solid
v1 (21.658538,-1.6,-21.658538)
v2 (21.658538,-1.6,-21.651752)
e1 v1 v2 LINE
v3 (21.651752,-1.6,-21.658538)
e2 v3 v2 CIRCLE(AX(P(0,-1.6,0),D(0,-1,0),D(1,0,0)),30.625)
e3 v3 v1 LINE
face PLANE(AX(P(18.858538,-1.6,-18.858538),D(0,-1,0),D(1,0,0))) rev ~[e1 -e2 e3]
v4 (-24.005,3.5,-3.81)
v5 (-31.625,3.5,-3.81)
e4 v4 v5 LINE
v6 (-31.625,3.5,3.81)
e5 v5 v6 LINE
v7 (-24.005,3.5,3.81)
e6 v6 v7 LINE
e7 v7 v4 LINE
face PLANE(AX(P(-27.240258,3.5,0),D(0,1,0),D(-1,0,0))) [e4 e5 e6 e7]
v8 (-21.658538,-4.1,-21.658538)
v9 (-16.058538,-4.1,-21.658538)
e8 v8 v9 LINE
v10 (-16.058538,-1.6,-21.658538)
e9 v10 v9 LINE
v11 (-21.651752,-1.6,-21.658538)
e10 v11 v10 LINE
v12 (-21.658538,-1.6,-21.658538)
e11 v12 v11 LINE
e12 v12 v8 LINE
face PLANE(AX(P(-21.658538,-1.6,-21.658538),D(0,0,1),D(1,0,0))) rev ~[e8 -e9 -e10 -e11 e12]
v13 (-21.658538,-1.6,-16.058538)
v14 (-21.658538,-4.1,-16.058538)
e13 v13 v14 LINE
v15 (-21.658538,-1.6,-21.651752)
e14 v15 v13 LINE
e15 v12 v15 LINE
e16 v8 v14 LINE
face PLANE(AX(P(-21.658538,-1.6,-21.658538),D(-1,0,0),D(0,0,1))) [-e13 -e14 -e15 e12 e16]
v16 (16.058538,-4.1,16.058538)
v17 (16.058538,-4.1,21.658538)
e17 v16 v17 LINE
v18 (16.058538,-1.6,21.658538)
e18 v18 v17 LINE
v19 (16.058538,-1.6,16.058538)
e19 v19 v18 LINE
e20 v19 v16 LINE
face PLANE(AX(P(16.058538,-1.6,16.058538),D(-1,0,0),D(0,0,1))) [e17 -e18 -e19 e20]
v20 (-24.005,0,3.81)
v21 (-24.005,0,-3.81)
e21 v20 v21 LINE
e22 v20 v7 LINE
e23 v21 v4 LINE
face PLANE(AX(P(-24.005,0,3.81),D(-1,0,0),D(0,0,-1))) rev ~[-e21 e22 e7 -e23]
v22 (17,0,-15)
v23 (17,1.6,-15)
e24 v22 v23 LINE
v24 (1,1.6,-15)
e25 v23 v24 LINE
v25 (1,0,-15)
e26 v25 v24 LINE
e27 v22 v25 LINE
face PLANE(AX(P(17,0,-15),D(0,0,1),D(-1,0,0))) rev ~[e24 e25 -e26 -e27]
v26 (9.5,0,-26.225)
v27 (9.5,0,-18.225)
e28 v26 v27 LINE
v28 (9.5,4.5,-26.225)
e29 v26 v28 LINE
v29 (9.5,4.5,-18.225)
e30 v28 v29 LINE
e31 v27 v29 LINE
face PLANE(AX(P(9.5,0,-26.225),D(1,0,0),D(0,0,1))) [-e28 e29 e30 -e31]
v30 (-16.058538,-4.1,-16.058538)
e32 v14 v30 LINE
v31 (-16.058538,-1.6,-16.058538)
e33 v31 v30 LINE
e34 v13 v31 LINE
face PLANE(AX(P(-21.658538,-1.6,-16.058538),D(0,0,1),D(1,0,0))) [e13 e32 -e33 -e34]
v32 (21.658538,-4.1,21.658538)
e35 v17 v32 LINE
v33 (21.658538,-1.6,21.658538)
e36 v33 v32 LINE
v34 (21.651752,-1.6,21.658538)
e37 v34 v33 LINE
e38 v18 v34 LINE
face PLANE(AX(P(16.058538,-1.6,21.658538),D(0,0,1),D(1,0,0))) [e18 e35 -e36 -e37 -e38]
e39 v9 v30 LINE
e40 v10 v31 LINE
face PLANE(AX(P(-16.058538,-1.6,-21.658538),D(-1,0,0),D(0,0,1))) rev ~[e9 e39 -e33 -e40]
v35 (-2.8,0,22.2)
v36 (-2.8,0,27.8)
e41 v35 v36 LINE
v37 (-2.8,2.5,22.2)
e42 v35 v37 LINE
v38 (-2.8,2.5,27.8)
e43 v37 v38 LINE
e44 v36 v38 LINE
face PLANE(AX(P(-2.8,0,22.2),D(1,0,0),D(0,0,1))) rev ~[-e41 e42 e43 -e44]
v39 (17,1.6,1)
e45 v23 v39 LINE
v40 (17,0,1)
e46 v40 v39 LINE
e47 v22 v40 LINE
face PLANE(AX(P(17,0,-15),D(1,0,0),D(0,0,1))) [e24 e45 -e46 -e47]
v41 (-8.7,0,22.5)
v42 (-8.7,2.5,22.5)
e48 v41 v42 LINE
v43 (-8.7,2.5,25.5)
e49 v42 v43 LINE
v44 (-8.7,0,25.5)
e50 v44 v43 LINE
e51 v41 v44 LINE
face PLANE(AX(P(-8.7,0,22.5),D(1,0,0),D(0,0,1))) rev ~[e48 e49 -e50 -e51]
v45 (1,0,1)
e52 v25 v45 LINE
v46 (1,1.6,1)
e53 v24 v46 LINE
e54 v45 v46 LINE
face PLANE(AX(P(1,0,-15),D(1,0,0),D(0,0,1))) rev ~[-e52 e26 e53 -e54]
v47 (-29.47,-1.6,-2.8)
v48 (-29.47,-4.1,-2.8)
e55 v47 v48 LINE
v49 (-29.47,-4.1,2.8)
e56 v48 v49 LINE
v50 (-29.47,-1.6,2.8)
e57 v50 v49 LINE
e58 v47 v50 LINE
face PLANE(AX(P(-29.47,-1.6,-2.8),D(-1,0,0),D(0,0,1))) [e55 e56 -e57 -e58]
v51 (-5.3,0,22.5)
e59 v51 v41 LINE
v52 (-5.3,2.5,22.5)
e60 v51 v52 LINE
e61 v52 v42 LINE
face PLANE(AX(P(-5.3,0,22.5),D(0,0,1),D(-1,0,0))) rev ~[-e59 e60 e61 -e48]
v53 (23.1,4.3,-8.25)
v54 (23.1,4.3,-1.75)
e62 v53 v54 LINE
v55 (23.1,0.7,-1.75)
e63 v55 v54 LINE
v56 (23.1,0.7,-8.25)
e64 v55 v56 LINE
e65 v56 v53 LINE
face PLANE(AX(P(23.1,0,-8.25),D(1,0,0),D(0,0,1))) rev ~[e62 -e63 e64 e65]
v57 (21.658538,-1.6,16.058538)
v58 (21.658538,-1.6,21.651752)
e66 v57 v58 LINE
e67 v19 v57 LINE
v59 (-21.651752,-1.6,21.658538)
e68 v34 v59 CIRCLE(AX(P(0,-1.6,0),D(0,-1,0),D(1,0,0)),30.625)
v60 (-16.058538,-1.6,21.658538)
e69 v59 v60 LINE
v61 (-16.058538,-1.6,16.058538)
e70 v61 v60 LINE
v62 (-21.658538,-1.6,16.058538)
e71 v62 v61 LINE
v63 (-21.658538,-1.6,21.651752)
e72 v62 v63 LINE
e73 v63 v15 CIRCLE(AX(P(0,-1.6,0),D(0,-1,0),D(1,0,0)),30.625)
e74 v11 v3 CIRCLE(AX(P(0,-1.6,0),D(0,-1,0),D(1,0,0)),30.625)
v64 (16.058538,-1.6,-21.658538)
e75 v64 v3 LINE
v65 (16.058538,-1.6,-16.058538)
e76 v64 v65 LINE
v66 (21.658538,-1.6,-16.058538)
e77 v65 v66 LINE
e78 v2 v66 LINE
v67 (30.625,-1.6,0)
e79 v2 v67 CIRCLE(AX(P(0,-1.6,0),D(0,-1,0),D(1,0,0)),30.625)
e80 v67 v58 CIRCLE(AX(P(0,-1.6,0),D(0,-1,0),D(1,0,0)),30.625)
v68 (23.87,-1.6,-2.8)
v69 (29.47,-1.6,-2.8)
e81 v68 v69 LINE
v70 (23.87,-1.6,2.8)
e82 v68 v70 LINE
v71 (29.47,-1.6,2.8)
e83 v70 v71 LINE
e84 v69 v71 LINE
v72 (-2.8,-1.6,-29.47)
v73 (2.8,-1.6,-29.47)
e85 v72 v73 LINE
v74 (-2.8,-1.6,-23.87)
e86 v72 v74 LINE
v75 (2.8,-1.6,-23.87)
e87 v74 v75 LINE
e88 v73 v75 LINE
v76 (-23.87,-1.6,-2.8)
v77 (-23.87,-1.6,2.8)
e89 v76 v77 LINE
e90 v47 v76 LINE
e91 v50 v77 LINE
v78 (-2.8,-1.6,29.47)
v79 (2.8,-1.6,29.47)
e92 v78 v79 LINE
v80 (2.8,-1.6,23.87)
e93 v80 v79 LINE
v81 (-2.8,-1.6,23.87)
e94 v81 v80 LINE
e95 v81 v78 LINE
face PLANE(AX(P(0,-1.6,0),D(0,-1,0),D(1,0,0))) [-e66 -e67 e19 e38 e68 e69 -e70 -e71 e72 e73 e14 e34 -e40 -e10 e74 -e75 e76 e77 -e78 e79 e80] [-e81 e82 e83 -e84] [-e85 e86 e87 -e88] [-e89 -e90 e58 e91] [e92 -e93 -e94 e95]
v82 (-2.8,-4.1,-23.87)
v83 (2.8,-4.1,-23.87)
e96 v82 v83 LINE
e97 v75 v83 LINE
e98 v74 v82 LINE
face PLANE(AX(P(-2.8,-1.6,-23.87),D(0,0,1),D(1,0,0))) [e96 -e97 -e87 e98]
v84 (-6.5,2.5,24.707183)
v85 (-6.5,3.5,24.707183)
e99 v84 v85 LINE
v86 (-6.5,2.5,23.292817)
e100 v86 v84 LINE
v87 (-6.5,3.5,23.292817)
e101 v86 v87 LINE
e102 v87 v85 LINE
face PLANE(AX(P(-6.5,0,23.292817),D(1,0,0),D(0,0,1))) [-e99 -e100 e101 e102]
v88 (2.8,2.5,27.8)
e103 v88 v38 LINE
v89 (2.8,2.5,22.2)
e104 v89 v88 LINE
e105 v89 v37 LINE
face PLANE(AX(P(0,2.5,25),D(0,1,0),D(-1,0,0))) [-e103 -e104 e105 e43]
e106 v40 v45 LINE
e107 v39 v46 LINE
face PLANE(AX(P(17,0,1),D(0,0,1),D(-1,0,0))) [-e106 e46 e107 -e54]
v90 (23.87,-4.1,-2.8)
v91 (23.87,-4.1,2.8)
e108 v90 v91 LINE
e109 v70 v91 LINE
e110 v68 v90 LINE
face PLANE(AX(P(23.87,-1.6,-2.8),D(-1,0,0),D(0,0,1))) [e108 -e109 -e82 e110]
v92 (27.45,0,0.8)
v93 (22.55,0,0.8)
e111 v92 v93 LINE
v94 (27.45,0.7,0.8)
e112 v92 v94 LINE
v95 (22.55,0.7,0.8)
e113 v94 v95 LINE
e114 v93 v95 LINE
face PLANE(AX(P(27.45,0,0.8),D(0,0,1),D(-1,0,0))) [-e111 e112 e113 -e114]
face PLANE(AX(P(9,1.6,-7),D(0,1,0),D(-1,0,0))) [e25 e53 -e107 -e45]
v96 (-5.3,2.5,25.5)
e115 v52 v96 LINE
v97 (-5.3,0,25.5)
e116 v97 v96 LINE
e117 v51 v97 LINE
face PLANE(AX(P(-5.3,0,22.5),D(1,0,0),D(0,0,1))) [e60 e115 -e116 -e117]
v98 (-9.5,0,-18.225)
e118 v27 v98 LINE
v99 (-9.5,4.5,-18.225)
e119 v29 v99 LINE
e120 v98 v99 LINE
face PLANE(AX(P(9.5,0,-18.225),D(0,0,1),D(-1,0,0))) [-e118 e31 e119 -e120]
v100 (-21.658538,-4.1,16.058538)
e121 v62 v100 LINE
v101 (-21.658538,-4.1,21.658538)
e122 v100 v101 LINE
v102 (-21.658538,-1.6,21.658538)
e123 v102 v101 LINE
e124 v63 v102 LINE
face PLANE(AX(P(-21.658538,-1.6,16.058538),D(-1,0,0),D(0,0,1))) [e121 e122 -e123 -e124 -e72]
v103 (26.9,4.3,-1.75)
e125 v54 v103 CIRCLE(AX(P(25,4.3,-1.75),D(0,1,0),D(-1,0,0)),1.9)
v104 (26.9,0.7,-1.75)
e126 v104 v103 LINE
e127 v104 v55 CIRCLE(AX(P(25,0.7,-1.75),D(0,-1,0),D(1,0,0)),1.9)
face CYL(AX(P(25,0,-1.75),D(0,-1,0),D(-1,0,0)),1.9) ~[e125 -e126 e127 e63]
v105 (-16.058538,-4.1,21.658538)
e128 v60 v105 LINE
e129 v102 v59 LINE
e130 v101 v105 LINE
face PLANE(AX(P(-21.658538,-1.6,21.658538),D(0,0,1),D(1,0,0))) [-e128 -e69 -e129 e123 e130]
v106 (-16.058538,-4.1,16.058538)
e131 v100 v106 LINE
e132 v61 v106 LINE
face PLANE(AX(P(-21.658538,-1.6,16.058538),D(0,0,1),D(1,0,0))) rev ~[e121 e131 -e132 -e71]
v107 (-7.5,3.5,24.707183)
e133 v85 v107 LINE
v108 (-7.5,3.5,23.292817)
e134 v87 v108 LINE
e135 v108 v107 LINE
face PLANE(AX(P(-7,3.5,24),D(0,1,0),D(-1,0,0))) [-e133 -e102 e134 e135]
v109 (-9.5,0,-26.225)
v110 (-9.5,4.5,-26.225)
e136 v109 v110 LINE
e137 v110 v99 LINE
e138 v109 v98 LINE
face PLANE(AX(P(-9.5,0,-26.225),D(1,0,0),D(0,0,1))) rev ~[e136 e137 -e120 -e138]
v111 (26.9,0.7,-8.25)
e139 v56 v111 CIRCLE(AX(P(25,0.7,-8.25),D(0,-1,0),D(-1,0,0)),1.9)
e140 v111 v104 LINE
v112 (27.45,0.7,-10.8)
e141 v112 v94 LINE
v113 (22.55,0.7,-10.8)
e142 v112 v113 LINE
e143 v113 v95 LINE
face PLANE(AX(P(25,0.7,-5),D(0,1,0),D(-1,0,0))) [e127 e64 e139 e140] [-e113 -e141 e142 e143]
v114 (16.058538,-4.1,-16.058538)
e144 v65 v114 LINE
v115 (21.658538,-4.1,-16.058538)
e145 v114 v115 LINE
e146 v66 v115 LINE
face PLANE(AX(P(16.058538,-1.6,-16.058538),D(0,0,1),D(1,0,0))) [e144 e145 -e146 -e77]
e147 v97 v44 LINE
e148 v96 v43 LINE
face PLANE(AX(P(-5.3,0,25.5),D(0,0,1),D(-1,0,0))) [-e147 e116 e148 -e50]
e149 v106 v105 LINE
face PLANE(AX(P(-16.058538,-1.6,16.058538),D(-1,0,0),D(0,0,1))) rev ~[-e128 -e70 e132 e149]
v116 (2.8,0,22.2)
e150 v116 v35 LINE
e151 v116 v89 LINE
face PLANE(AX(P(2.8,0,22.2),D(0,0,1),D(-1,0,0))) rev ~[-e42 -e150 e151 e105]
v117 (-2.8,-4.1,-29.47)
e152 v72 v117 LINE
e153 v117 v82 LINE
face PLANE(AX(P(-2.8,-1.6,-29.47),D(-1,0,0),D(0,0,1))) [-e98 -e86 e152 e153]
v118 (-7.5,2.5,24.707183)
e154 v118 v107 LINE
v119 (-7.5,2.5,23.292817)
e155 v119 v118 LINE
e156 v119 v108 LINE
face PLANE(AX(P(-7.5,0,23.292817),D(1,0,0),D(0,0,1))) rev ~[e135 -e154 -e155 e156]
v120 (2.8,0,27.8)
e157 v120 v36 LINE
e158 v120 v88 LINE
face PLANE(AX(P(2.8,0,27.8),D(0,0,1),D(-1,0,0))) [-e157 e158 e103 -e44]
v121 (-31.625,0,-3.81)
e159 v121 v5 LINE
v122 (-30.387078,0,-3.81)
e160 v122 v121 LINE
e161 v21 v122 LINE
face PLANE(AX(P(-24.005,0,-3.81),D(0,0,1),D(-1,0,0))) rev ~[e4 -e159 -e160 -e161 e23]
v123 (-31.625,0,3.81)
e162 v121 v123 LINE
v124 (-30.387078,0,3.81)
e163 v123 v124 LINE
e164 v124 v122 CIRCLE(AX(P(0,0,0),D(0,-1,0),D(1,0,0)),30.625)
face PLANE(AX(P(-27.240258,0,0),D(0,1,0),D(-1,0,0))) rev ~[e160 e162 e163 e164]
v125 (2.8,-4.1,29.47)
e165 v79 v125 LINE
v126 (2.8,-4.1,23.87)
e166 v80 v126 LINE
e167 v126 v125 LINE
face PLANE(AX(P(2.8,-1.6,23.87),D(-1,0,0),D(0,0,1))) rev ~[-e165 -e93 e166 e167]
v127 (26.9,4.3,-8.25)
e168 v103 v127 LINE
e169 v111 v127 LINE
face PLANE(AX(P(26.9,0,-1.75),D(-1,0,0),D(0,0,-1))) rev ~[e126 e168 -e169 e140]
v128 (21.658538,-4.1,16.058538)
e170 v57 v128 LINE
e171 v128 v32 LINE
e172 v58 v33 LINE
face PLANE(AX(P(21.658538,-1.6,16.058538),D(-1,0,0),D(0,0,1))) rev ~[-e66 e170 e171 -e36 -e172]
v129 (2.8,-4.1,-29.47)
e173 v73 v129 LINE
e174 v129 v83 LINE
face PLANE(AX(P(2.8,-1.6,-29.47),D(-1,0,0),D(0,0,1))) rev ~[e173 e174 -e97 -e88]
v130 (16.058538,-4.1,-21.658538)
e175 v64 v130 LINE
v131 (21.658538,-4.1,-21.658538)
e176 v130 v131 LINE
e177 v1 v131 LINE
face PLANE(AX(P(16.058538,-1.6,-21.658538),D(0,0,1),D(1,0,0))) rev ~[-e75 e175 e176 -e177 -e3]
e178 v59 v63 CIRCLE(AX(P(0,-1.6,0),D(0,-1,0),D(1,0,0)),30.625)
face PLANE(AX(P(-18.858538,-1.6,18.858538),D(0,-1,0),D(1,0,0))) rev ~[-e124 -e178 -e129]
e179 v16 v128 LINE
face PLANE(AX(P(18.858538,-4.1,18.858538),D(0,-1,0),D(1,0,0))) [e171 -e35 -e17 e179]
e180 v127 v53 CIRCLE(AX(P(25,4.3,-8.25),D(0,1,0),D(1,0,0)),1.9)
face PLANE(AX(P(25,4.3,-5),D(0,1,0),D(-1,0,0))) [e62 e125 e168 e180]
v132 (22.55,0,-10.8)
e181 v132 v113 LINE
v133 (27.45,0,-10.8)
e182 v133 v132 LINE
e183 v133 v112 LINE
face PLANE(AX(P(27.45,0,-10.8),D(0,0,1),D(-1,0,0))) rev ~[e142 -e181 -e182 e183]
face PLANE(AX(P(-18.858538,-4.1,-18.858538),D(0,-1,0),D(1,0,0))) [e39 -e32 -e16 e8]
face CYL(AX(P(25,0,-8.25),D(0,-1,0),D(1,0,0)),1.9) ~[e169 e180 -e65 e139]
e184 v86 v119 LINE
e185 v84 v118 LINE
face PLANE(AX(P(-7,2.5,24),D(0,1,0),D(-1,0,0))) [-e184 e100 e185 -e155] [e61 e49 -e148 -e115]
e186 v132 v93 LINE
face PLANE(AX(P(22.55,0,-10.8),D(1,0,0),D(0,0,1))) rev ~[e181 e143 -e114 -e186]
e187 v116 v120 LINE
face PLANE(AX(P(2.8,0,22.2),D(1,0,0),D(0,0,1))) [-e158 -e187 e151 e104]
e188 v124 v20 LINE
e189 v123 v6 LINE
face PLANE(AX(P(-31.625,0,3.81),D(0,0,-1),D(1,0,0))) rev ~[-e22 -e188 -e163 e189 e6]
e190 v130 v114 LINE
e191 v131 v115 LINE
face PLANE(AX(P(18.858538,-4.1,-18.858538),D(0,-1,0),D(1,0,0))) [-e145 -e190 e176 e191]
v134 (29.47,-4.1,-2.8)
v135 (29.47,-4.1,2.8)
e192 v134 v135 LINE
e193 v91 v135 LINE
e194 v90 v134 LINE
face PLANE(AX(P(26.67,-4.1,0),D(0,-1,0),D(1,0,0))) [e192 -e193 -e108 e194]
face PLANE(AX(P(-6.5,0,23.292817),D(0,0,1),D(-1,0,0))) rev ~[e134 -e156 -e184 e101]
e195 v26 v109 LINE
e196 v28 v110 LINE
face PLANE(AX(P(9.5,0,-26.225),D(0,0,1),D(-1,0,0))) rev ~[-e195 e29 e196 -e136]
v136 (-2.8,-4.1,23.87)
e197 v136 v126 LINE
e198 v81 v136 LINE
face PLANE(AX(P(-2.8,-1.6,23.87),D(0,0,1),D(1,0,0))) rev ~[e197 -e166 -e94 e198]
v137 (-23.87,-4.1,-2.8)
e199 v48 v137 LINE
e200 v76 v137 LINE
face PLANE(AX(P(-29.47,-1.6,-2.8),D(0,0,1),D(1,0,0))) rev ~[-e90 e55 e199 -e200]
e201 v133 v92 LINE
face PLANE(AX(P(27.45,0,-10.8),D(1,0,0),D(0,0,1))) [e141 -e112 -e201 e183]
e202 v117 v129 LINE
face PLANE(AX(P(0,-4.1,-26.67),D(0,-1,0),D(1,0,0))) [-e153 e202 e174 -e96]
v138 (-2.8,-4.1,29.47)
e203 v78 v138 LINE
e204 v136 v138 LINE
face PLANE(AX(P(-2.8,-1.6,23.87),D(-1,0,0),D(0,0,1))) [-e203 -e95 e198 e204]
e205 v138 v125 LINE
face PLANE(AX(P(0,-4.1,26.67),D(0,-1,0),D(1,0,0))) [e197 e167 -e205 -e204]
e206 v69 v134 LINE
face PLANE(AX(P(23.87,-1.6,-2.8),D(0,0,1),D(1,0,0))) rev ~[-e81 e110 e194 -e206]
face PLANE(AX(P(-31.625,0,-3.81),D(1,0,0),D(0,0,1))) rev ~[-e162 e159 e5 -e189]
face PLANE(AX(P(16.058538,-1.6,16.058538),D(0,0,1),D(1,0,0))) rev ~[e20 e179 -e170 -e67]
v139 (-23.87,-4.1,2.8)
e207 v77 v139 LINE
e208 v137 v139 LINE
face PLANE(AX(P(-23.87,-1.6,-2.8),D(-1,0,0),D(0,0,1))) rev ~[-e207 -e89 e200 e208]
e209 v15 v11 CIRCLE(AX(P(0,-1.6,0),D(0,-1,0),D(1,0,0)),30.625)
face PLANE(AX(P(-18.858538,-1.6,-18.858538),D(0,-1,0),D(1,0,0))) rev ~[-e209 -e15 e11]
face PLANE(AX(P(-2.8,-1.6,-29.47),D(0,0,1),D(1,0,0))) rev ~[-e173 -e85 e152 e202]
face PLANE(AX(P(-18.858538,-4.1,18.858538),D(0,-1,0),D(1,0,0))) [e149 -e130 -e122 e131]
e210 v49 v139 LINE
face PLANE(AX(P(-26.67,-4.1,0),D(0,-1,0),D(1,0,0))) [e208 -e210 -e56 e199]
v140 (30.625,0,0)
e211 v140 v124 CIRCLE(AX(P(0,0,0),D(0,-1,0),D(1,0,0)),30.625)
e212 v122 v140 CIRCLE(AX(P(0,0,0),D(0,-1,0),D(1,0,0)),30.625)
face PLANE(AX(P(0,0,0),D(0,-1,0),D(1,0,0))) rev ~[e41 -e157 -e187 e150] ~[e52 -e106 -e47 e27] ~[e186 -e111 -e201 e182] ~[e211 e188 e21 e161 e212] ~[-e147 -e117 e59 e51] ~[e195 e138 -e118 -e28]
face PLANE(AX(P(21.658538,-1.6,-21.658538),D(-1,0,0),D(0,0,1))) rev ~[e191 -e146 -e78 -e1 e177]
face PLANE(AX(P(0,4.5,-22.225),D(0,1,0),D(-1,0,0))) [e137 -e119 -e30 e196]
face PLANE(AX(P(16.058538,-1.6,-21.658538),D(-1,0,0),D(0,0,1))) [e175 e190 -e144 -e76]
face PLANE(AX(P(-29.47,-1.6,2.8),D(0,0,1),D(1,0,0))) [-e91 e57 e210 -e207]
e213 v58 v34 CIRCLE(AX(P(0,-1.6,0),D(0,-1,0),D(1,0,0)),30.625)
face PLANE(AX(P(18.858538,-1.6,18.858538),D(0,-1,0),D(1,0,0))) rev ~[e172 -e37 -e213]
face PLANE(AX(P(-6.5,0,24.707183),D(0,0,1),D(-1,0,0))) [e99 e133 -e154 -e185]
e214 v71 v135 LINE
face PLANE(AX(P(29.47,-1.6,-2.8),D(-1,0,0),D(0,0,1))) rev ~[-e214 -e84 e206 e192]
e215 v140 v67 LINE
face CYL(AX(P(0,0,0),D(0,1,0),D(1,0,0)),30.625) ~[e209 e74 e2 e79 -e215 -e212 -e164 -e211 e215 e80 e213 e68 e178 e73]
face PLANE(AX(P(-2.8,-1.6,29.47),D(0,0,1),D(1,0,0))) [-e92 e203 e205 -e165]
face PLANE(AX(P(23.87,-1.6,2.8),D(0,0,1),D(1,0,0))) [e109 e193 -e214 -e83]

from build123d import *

# Parameters (mm, degrees)
F0_R      = 30.625
F1_DEPTH  = 1.6
F2_W      = 5.6
F2_H      = 5.6
F3_DEPTH  = 2.5
F4_W      = 16
F4_H      = 16
F5_DEPTH  = 1.6
F4_W_2    = 5.6
F4_H_2    = 5.6
F6_DEPTH  = 2.5
F4_W_3    = 3.4
F4_H_3    = 3
F4_W_4    = 1
F4_H_4    = 1.4143656492
F7_DEPTH  = 2.5
F8_DEPTH  = 3.5
F4_W_5    = 19
F4_H_5    = 8
F10_DEPTH = 4.5
F4_W_6    = 4.9
F4_H_6    = 11.6
F11_DEPTH = 0.7
F12_DEPTH = 4.3
F13_DEPTH = 3.5


# Not quite as in the source:
# - the program builds the solid bodies; features that only make, move or delete a surface that nothing else refers to are left out


with BuildPart() as f1:
    # F0 (on Front) → F1 (new body)
    with BuildSketch(Plane.XZ):
        Circle(F0_R)
    extrude(amount=F1_DEPTH)

    # F2 (on face) → F3 (join)
    with BuildSketch(Plane.XZ.offset(1.6)):
        with Locations((-26.67, 0)):
            Rectangle(F2_W, F2_H)
        with Locations((-18.8585378542, 18.8585378542)):
            Rectangle(F2_W, F2_H)
        with Locations((0, 26.67)):
            Rectangle(F2_W, F2_H)
        with Locations((18.8585378542, 18.8585378542)):
            Rectangle(F2_W, F2_H)
        with Locations((26.67, 0)):
            Rectangle(F2_W, F2_H)
        with Locations((18.8585378542, -18.8585378542)):
            Rectangle(F2_W, F2_H)
        with Locations((0, -26.67)):
            Rectangle(F2_W, F2_H)
        with Locations((-18.8585378542, -18.8585378542)):
            Rectangle(F2_W, F2_H)
    extrude(amount=F3_DEPTH)

    # F4 (on face) → F5 (join)
    with BuildSketch(Plane(origin=(0, 0, 0), x_dir=(-1, 0, 0), z_dir=(0, 1, 0))):
        with Locations((-9, -7)):
            Rectangle(F4_W, F4_H)
    extrude(amount=F5_DEPTH)

    # F4 (on face) → F6 (join)
    with BuildSketch(Plane(origin=(0, 0, 0), x_dir=(-1, 0, 0), z_dir=(0, 1, 0))):
        with Locations((0, 25)):
            Rectangle(F4_W_2, F4_H_2)
    extrude(amount=F6_DEPTH)

    # F4 (on face) → F7 (join)
    with BuildSketch(Plane(origin=(0, 0, 0), x_dir=(-1, 0, 0), z_dir=(0, 1, 0))):
        with Locations((7, 24)):
            Rectangle(F4_W_3, F4_H_3)
        with Locations((7, 24)):
            Rectangle(F4_W_4, F4_H_4, mode=Mode.SUBTRACT)
    extrude(amount=F7_DEPTH)

    # F4 (on face) → F8 (join)
    with BuildSketch(Plane(origin=(0, 0, 0), x_dir=(-1, 0, 0), z_dir=(0, 1, 0))):
        with Locations((7, 24)):
            Rectangle(F4_W_4, F4_H_4)
    extrude(amount=F8_DEPTH)

    # F4 (on face) → F10 (join)
    with BuildSketch(Plane(origin=(0, 0, 0), x_dir=(-1, 0, 0), z_dir=(0, 1, 0))):
        with Locations((0, -22.225)):
            Rectangle(F4_W_5, F4_H_5)
    extrude(amount=F10_DEPTH)

    # F4 (on face) → F11 (join)
    with BuildSketch(Plane(origin=(0, 0, 0), x_dir=(-1, 0, 0), z_dir=(0, 1, 0))):
        with Locations((-25, -5)):
            Rectangle(F4_W_6, F4_H_6)
        with BuildLine():
            ThreePointArc((-26.9, -1.75), (-25, 0.15), (-23.1, -1.75))
            Line((-23.1, -1.75), (-23.1, -8.25))
            ThreePointArc((-23.1, -8.25), (-25, -10.15), (-26.9, -8.25))
            Line((-26.9, -8.25), (-26.9, -1.75))
        make_face(mode=Mode.SUBTRACT)
    extrude(amount=F11_DEPTH)

    # F4 (on face) → F12 (join)
    with BuildSketch(Plane(origin=(0, 0, 0), x_dir=(-1, 0, 0), z_dir=(0, 1, 0))):
        with BuildLine():
            Line((-23.1, -8.25), (-23.1, -1.75))
            ThreePointArc((-23.1, -1.75), (-25, 0.15), (-26.9, -1.75))
            Line((-26.9, -1.75), (-26.9, -8.25))
            ThreePointArc((-26.9, -8.25), (-25, -10.15), (-23.1, -8.25))
        make_face()
    extrude(amount=F12_DEPTH)

    # F4 (on face) → F13 (join)
    with BuildSketch(Plane(origin=(0, 0, 0), x_dir=(-1, 0, 0), z_dir=(0, 1, 0))):
        with BuildLine():
            Line((24.005, -3.81), (30.387078257, -3.81))
            ThreePointArc((30.387078257, -3.81), (30.5654616898, -1.90871074), (30.625, 0))
            ThreePointArc((30.625, 0), (30.5654616898, 1.90871074), (30.387078257, 3.81))
            Line((30.387078257, 3.81), (24.005, 3.81))
            Line((24.005, 3.81), (24.005, -3.81))
        make_face()
        with BuildLine():
            Line((30.387078257, -3.81), (31.625, -3.81))
            Line((31.625, -3.81), (31.625, 3.81))
            Line((31.625, 3.81), (30.387078257, 3.81))
            ThreePointArc((30.387078257, 3.81), (30.5654616898, 1.90871074), (30.625, 0))
            ThreePointArc((30.625, 0), (30.5654616898, -1.90871074), (30.387078257, -3.81))
        make_face()
    extrude(amount=F13_DEPTH)


solid = f1.part
